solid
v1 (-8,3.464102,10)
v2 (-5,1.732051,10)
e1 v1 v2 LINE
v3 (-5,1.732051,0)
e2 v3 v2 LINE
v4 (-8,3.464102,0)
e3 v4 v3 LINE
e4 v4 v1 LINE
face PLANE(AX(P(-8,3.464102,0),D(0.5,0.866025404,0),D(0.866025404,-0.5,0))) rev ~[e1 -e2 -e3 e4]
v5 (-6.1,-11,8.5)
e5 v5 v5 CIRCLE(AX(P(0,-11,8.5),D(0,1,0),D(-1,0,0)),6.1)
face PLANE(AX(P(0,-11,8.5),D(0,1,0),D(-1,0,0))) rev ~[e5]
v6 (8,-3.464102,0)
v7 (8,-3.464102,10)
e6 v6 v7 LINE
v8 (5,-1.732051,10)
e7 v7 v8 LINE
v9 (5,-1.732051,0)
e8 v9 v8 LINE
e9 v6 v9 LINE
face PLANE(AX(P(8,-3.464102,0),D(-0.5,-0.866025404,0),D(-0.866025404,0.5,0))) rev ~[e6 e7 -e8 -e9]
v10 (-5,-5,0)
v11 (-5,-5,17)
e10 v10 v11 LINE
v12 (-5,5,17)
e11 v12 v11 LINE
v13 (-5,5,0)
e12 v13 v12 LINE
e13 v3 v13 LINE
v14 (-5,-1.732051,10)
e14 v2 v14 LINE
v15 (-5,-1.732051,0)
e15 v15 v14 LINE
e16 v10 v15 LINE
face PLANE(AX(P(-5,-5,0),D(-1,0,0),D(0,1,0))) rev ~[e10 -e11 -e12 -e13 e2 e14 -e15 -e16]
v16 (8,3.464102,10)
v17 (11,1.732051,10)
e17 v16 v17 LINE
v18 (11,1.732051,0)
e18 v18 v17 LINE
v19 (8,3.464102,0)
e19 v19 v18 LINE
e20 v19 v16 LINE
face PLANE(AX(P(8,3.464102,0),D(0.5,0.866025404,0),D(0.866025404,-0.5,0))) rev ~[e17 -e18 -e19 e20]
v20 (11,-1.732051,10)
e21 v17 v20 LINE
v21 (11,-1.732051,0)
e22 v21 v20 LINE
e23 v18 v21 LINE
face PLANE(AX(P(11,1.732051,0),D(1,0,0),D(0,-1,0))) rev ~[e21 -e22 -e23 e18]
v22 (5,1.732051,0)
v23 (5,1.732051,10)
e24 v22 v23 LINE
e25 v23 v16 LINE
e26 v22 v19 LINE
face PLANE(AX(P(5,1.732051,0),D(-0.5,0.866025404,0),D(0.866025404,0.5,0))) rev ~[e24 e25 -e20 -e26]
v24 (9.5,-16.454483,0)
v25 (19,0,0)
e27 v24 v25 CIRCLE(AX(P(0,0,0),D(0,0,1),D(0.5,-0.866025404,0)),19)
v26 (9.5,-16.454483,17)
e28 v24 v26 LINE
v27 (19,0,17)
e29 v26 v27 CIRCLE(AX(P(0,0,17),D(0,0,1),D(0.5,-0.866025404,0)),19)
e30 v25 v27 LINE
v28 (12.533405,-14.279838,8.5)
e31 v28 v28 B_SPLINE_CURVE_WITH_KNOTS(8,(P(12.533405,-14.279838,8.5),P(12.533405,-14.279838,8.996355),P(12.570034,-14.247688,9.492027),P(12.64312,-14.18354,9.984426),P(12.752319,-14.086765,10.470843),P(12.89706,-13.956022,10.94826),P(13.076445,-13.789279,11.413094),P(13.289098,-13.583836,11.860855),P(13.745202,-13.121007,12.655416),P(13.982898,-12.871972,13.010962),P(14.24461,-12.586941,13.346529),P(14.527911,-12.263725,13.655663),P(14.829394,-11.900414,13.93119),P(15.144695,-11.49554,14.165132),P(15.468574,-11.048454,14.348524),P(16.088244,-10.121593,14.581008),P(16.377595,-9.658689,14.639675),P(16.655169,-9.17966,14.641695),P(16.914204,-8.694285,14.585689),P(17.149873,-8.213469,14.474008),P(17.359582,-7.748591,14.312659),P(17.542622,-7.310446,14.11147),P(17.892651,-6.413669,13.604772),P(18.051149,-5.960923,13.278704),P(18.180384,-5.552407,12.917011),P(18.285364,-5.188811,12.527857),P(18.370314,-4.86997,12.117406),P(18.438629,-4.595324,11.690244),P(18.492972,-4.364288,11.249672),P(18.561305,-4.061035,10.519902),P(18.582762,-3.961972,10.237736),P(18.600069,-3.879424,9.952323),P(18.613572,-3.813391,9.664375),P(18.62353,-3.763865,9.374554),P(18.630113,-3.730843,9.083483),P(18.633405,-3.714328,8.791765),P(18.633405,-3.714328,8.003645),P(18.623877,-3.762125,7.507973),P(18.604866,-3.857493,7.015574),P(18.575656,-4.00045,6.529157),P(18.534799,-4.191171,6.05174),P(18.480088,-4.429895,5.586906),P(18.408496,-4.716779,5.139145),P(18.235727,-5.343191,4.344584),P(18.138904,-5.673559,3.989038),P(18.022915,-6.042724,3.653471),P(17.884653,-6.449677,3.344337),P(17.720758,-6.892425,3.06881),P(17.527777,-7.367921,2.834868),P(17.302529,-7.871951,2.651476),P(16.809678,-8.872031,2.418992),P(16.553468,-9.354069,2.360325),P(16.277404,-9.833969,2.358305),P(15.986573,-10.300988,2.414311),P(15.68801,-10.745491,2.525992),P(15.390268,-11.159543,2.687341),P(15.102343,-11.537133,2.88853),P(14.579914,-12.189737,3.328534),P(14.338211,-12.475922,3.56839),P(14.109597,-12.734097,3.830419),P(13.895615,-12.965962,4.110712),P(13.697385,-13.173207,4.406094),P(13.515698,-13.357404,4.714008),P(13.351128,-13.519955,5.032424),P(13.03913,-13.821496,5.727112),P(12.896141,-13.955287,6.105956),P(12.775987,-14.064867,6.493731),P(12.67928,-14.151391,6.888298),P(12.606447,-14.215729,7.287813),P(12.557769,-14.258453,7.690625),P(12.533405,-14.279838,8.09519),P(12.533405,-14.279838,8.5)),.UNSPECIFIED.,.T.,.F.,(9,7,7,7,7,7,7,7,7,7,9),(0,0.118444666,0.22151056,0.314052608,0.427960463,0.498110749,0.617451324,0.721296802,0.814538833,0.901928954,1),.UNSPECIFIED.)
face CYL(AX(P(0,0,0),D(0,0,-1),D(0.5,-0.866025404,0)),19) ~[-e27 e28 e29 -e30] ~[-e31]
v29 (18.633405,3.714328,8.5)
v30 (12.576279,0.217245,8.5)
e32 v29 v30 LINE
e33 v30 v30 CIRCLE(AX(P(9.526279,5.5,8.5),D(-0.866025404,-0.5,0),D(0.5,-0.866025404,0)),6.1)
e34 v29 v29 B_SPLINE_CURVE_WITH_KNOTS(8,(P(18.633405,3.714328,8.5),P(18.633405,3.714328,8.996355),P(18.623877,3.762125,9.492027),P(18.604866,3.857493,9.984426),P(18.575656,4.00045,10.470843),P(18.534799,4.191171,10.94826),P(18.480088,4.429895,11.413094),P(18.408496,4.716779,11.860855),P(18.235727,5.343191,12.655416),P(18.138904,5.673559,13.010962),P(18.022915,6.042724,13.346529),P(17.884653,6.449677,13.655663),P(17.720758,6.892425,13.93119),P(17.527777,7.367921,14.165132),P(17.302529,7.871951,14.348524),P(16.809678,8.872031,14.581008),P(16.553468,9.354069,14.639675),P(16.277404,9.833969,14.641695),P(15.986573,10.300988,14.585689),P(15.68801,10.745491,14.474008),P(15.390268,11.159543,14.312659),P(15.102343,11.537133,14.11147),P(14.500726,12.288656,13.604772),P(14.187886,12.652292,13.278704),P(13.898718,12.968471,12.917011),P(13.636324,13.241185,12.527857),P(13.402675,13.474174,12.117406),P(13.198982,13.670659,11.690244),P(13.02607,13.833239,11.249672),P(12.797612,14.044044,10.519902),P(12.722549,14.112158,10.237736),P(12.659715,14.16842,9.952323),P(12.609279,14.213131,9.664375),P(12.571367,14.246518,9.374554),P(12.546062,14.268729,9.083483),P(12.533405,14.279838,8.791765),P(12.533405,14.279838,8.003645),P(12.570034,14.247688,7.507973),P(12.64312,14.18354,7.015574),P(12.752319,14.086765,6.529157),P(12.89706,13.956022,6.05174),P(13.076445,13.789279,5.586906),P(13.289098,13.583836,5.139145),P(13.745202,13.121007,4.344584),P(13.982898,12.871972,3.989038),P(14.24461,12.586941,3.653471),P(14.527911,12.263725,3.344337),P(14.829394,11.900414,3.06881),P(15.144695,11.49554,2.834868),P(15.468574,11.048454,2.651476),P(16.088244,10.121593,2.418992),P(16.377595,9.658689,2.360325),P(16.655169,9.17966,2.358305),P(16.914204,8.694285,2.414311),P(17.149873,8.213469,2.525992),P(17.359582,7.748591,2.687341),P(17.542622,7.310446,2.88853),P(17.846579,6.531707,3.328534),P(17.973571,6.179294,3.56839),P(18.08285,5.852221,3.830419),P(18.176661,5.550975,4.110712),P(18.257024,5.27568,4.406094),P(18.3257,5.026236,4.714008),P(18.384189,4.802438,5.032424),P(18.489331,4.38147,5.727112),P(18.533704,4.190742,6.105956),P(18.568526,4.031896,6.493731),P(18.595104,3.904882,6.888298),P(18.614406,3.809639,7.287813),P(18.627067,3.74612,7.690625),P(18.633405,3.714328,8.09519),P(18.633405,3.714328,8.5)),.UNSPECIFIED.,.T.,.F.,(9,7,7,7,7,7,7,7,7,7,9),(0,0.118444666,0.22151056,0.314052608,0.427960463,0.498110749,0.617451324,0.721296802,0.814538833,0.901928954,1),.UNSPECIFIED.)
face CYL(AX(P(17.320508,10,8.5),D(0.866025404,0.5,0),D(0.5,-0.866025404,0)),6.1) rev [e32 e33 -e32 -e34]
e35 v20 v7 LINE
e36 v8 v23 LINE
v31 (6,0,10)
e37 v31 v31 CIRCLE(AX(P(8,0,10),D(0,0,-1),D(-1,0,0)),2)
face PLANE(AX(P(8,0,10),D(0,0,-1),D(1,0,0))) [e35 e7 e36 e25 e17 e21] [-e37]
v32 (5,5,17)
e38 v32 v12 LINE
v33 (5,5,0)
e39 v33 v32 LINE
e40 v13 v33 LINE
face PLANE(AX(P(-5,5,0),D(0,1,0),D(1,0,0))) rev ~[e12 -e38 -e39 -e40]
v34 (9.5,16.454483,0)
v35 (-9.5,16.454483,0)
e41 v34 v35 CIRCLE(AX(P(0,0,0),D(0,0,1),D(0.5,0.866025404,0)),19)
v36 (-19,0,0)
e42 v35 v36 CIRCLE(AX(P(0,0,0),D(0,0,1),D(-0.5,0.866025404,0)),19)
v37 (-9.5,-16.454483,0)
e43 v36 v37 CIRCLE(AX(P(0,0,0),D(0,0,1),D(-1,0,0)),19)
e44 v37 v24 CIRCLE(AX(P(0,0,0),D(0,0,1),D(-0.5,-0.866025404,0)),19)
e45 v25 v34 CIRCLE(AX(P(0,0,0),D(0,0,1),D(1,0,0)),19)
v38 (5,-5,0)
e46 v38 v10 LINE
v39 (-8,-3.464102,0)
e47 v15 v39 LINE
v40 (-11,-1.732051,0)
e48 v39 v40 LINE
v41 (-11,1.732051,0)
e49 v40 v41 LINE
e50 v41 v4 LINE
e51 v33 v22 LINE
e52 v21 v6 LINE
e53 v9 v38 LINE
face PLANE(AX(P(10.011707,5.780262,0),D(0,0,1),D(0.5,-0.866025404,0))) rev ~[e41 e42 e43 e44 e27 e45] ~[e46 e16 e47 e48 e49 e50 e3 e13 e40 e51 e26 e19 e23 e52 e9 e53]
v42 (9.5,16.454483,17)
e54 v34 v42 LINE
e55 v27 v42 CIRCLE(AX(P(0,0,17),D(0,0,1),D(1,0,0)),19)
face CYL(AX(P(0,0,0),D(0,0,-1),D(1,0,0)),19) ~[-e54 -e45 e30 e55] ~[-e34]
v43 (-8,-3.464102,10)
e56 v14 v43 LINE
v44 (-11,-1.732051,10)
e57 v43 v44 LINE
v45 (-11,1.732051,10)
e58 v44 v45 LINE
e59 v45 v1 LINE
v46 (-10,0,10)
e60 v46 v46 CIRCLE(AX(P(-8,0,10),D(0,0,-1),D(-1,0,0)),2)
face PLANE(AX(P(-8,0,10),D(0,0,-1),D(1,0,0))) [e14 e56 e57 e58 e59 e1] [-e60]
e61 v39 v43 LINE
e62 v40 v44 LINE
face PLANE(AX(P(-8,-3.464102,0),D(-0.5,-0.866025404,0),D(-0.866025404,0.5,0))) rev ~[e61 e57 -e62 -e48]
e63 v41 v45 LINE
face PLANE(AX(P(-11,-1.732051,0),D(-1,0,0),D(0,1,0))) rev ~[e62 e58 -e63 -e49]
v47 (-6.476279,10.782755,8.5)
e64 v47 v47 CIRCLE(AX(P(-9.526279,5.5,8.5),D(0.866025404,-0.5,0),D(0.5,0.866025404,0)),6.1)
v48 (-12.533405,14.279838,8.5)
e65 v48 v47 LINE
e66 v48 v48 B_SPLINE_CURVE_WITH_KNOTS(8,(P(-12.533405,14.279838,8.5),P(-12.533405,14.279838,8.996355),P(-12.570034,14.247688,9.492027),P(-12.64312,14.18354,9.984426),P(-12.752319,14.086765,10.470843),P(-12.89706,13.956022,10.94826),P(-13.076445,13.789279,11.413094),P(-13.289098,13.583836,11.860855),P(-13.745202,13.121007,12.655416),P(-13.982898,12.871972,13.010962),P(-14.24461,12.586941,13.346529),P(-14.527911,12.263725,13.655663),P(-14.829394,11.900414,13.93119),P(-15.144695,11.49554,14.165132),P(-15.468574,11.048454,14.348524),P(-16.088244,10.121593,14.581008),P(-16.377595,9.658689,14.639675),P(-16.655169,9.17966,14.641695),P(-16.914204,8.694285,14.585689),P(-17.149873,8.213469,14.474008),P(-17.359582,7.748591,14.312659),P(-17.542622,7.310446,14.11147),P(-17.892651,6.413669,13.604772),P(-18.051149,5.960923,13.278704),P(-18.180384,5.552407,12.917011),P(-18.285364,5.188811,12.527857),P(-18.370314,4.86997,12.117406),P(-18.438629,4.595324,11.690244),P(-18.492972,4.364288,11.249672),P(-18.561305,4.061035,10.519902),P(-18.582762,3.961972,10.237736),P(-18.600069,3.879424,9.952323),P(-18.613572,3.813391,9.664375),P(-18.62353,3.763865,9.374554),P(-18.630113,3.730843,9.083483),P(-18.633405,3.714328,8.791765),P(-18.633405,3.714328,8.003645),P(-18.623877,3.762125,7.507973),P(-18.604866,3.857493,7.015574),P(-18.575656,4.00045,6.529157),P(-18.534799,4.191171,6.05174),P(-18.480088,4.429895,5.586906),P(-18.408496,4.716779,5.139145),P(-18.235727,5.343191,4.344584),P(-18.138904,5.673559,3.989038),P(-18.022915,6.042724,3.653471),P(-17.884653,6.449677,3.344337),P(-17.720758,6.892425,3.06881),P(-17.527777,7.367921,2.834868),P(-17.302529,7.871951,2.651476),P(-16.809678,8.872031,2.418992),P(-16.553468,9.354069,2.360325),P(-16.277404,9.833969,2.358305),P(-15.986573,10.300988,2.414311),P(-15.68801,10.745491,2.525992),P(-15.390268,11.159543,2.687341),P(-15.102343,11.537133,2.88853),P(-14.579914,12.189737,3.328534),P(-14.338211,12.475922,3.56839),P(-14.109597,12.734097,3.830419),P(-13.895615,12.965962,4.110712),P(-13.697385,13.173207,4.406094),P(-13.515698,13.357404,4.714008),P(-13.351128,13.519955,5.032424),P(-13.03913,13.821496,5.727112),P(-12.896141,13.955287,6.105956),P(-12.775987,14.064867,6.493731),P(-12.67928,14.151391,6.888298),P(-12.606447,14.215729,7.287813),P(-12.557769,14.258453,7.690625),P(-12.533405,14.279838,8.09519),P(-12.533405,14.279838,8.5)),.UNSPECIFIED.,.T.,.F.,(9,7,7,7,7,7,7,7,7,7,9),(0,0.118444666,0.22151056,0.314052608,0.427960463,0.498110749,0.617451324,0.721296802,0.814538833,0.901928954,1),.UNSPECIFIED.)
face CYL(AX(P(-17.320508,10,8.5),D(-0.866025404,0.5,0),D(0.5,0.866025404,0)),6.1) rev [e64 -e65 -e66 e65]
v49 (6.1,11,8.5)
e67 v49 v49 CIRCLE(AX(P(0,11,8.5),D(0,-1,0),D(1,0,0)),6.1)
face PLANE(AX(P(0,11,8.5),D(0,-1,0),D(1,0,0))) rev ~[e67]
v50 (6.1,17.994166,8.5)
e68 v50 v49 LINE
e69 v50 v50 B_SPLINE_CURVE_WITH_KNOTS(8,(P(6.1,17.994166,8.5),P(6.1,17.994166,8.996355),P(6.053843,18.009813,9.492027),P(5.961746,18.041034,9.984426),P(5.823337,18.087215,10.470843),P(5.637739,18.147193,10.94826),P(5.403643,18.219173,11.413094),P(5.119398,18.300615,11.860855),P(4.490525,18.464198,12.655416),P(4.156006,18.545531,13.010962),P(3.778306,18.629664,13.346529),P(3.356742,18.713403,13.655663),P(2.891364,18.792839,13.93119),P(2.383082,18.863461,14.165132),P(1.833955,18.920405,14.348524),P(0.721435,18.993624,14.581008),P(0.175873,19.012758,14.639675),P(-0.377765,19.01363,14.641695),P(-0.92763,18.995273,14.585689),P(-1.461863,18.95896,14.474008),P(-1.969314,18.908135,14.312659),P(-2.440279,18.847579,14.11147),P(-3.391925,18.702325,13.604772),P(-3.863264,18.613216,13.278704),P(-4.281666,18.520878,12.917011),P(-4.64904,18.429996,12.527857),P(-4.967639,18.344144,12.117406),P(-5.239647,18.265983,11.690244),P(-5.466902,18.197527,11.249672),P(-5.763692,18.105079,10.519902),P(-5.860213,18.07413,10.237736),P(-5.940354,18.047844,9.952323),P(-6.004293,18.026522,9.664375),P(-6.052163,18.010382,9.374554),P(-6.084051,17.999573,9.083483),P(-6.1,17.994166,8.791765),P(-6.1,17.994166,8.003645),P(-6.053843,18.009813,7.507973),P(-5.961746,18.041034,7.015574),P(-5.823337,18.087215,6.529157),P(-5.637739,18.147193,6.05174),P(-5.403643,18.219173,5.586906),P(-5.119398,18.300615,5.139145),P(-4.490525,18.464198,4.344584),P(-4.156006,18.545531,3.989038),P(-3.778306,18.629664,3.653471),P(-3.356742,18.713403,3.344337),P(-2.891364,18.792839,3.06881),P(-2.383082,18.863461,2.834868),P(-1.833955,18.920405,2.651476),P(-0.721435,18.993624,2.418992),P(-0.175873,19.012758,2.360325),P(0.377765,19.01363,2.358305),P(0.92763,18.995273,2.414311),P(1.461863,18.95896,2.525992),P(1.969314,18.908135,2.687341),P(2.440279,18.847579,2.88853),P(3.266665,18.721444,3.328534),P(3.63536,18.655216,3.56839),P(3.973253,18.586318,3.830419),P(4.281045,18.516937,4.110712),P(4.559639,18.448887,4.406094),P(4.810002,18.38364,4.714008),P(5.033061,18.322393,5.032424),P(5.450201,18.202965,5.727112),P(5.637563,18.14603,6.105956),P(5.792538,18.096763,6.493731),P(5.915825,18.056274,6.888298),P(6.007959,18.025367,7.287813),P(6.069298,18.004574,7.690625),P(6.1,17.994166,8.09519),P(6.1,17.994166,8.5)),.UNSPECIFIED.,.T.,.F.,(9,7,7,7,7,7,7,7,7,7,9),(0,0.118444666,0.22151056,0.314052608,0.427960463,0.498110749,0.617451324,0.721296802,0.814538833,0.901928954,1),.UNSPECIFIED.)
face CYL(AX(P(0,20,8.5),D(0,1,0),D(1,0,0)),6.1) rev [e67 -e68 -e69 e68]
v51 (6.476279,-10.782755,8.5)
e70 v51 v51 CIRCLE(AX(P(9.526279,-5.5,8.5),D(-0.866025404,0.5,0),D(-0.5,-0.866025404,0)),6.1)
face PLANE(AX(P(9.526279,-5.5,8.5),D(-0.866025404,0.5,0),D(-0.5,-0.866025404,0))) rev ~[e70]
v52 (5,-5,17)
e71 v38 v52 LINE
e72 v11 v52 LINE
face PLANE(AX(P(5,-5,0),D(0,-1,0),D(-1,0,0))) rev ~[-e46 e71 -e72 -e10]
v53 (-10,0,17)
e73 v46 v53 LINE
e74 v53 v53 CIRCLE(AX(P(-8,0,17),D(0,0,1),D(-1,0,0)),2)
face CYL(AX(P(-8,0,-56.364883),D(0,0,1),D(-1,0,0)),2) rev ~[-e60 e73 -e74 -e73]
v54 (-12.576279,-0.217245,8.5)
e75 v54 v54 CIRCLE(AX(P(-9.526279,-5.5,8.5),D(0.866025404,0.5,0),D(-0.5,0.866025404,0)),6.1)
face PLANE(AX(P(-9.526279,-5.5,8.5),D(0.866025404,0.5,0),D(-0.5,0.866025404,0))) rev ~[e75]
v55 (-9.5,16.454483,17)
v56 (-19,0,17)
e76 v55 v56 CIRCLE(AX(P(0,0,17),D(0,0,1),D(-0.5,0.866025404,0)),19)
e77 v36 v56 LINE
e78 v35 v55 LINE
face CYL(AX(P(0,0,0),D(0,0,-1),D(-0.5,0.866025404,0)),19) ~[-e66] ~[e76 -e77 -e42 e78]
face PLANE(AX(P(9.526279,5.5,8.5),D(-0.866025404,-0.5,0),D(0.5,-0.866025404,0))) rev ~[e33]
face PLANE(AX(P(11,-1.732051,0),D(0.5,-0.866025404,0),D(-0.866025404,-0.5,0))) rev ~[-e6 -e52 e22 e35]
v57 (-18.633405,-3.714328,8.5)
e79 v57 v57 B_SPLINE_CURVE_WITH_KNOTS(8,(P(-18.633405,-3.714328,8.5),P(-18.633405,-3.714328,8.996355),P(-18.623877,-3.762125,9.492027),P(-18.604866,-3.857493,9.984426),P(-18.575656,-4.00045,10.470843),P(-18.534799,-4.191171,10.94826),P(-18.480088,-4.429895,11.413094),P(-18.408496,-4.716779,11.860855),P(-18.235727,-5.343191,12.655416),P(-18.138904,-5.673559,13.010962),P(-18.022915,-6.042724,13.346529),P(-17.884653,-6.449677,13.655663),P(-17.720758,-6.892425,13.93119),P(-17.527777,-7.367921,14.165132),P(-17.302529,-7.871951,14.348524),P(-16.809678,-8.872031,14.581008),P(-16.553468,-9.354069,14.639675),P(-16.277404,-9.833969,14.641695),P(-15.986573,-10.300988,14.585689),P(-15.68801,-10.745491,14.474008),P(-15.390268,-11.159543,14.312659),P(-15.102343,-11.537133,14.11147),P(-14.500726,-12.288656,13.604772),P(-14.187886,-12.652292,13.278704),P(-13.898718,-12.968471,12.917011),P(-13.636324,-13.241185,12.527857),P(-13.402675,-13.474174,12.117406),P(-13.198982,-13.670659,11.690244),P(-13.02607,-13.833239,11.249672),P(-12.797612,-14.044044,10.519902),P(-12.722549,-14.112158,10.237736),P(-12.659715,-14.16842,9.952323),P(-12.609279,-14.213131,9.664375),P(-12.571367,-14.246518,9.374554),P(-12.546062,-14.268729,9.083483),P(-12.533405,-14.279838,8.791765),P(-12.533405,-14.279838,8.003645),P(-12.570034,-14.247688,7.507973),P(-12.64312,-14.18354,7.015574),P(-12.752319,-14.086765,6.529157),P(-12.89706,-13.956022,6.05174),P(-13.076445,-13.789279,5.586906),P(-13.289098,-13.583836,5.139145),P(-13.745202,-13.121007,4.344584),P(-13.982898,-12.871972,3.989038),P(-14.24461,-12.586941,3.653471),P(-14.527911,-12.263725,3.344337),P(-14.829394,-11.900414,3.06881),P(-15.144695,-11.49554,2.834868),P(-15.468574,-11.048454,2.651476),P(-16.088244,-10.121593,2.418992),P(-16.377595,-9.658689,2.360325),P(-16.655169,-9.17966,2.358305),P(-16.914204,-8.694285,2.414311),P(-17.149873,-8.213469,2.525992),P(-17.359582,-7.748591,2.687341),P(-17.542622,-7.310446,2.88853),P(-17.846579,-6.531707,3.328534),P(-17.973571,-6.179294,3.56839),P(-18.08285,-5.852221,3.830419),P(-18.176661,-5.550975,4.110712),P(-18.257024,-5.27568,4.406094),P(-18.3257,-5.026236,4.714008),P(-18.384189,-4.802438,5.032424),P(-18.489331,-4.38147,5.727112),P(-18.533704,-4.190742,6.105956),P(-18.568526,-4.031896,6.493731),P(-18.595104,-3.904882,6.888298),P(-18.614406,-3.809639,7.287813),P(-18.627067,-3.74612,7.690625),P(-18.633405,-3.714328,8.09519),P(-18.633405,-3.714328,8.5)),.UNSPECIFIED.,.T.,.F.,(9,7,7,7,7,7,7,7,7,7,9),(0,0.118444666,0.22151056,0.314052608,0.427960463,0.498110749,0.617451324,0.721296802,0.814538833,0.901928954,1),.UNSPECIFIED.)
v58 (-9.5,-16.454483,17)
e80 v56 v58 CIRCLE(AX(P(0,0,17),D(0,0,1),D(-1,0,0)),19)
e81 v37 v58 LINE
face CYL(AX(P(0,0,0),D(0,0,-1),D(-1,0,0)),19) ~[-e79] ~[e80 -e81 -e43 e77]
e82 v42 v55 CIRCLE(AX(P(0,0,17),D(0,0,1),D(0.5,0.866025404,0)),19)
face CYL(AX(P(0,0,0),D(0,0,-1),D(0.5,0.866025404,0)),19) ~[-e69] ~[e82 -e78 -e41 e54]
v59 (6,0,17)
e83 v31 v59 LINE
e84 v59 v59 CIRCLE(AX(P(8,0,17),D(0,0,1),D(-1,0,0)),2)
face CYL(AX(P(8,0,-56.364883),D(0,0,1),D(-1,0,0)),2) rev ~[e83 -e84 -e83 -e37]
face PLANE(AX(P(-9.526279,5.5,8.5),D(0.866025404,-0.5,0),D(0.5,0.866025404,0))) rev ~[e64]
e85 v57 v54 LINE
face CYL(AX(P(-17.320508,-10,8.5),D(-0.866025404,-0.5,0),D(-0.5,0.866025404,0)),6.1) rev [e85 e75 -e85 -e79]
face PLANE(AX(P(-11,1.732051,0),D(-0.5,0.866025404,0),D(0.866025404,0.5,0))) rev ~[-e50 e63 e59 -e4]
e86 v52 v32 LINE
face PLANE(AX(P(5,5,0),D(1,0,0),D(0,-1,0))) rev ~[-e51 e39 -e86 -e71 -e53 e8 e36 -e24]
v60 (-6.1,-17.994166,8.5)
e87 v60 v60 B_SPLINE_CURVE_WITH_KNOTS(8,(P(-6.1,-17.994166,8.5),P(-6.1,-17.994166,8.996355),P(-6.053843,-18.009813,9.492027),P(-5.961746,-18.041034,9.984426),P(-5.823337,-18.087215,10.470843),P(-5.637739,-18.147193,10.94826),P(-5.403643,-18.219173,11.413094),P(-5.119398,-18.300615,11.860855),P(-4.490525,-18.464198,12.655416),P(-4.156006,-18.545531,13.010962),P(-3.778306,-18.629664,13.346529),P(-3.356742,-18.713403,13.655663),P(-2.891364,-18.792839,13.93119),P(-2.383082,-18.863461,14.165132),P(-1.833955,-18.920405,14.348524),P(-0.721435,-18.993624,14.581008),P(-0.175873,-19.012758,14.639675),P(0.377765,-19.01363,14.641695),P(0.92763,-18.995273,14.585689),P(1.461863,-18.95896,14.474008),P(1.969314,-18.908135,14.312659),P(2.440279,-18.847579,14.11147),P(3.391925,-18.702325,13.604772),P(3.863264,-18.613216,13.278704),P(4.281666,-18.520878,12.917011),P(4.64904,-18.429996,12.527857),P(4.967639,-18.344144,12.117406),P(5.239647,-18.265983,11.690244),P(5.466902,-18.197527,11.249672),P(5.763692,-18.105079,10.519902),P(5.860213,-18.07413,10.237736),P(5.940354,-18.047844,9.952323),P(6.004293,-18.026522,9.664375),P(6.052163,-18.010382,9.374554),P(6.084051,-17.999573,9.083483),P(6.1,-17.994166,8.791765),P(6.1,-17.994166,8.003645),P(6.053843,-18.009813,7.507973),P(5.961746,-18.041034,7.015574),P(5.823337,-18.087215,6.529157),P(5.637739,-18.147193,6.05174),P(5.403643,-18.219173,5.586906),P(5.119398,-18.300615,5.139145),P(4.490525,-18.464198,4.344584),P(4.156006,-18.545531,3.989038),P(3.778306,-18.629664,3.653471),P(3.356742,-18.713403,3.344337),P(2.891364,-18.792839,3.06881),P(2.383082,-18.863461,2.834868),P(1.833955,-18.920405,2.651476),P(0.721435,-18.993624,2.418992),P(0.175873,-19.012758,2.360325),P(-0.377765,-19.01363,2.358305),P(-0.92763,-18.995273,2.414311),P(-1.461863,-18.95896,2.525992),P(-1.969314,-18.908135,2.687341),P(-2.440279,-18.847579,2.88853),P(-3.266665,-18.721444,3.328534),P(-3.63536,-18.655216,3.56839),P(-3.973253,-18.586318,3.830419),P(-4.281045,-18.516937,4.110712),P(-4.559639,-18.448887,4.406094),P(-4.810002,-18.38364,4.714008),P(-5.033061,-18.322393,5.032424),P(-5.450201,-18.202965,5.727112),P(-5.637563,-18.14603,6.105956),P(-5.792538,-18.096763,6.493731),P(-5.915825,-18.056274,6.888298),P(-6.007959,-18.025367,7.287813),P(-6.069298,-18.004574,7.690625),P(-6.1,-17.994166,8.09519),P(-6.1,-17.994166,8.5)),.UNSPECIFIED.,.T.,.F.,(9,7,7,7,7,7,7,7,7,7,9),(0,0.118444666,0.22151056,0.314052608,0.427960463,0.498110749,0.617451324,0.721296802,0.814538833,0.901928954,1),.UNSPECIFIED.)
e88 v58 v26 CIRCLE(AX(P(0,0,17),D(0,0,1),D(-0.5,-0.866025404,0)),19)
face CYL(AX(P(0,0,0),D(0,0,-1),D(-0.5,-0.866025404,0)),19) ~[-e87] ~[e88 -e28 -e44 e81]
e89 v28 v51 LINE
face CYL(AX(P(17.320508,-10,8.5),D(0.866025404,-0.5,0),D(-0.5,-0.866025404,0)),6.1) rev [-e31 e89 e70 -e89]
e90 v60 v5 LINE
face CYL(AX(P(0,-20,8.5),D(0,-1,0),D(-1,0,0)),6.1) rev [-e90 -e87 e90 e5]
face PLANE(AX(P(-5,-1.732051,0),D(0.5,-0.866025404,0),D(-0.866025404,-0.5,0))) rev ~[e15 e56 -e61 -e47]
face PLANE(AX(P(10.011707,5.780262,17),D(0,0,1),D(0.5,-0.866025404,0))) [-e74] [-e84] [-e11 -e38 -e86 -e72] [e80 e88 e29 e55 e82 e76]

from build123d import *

# Parameters (mm, degrees)
F1_DEPTH  = 17
F5_R      = 6.1
F6_DEPTH  = 9
F7_COUNT  = 6
F9_D      = 4
F10_R     = 2
F11_DEPTH = 10
F12_DEPTH = 17.0010001


with BuildPart() as f1:
    # F0 (on Top) → F1 (new body)
    with BuildSketch(Plane.XY):
        with BuildLine():
            Line((0, 0), (9.5, 16.4544826719))
            ThreePointArc((9.5, 16.4544826719), (0, 19), (-9.5, 16.4544826719))
            Line((-9.5, 16.4544826719), (0, 0))
        make_face()
    extrude(amount=F1_DEPTH)

    # F5 (on offset) → F6 (cut)
    with BuildSketch(Plane.XZ.offset(-20)):
        with Locations((0, 8.5)):
            Circle(F5_R)
    extrude(amount=F6_DEPTH, mode=Mode.SUBTRACT)

    # F7: F1 ×6 about axis
    f7_axis = Axis((0, 0, 0), (0, 0, 1))


with BuildPart() as f1_1:
    add(f1.part)
    for i in range(1, F7_COUNT):
        add(f1.part.rotate(f7_axis, i * 360 / F7_COUNT))

    # F9 (through all)
    with Locations(Plane(origin=(0, 0, 0), x_dir=(1, 0, 0), z_dir=(0, 0, -1))):
        with Locations((-8, 0), (8, 0)):
            Hole(F9_D / 2)

    # F10 (on face) → F11 (cut)
    with BuildSketch(Plane(origin=(0, 0, 0), x_dir=(1, 0, 0), z_dir=(0, 0, -1))):
        Polygon((-5, -1.7320508076), (-5, 1.7320508076), (-8, 3.4641016151), (-11, 1.7320508076), (-11, -1.7320508076), (-8, -3.4641016151), align=None)
        with Locations((-8, 0)):
            Circle(F10_R, mode=Mode.SUBTRACT)
        Polygon((5, 1.7320508076), (5, -1.7320508076), (8, -3.4641016151), (11, -1.7320508076), (11, 1.7320508076), (8, 3.4641016151), align=None)
        with Locations((8, 0)):
            Circle(F10_R, mode=Mode.SUBTRACT)
    extrude(amount=-F11_DEPTH, mode=Mode.SUBTRACT)

    # F8 (on face) → F12 (cut, through all)
    with BuildSketch(Plane(origin=(0, 0, 0), x_dir=(1, 0, 0), z_dir=(0, 0, -1))):
        with BuildLine():
            Line((0, 2.1), (0, 5))
            Line((0, 5), (-5, 5))
            Line((-5, 5), (-5, -5))
            Line((-5, -5), (5, -5))
            Line((5, -5), (5, 5))
            Line((5, 5), (2.8867513459, 5))
            Line((2.8867513459, 5), (1.05, 1.8186533479))
            ThreePointArc((1.05, 1.8186533479), (1.0751032483, 1.8039271065), (1.1, 1.788854382))
            ThreePointArc((1.1, 1.788854382), (1.833030278, 1.0246950766), (2.1, 0))
            ThreePointArc((2.1, 0), (1.833030278, -1.0246950766), (1.1, -1.788854382))
            ThreePointArc((1.1, -1.788854382), (0, -2.1), (-1.1, -1.788854382))
            ThreePointArc((-1.1, -1.788854382), (-2.1, 0), (-1.1, 1.788854382))
            ThreePointArc((-1.1, 1.788854382), (-0.5715793024, 2.020716977), (0, 2.1))
        make_face()
        with BuildLine():
            Line((2.8867513459, 5), (0, 5))
            Line((0, 5), (0, 2.1))
            ThreePointArc((0, 2.1), (0.5435199947, 2.0284442352), (1.05, 1.8186533479))
            Line((1.05, 1.8186533479), (2.8867513459, 5))
        make_face()
        with BuildLine():
            Line((0, 0), (0, 2.1))
            ThreePointArc((0, 2.1), (-0.5715793024, 2.020716977), (-1.1, 1.788854382))
            Line((-1.1, 1.788854382), (-1.1, -1.788854382))
            ThreePointArc((-1.1, -1.788854382), (0, -2.1), (1.1, -1.788854382))
            Line((1.1, -1.788854382), (1.1, 1.788854382))
            ThreePointArc((1.1, 1.788854382), (1.0751032483, 1.8039271065), (1.05, 1.8186533479))
            Line((1.05, 1.8186533479), (0, 0))
        make_face()
        with BuildLine():
            Line((-1.1, -1.788854382), (-1.1, 1.788854382))
            ThreePointArc((-1.1, 1.788854382), (-2.1, 0), (-1.1, -1.788854382))
        make_face()
        with BuildLine():
            ThreePointArc((2.1, 0), (1.833030278, 1.0246950766), (1.1, 1.788854382))
            Line((1.1, 1.788854382), (1.1, -1.788854382))
            ThreePointArc((1.1, -1.788854382), (1.833030278, -1.0246950766), (2.1, 0))
        make_face()
        with BuildLine():
            ThreePointArc((1.05, 1.8186533479), (0.5435199947, 2.0284442352), (0, 2.1))
            Line((0, 2.1), (0, 0))
            Line((0, 0), (1.05, 1.8186533479))
        make_face()
    extrude(amount=-F12_DEPTH, mode=Mode.SUBTRACT)


solid = f1_1.part
